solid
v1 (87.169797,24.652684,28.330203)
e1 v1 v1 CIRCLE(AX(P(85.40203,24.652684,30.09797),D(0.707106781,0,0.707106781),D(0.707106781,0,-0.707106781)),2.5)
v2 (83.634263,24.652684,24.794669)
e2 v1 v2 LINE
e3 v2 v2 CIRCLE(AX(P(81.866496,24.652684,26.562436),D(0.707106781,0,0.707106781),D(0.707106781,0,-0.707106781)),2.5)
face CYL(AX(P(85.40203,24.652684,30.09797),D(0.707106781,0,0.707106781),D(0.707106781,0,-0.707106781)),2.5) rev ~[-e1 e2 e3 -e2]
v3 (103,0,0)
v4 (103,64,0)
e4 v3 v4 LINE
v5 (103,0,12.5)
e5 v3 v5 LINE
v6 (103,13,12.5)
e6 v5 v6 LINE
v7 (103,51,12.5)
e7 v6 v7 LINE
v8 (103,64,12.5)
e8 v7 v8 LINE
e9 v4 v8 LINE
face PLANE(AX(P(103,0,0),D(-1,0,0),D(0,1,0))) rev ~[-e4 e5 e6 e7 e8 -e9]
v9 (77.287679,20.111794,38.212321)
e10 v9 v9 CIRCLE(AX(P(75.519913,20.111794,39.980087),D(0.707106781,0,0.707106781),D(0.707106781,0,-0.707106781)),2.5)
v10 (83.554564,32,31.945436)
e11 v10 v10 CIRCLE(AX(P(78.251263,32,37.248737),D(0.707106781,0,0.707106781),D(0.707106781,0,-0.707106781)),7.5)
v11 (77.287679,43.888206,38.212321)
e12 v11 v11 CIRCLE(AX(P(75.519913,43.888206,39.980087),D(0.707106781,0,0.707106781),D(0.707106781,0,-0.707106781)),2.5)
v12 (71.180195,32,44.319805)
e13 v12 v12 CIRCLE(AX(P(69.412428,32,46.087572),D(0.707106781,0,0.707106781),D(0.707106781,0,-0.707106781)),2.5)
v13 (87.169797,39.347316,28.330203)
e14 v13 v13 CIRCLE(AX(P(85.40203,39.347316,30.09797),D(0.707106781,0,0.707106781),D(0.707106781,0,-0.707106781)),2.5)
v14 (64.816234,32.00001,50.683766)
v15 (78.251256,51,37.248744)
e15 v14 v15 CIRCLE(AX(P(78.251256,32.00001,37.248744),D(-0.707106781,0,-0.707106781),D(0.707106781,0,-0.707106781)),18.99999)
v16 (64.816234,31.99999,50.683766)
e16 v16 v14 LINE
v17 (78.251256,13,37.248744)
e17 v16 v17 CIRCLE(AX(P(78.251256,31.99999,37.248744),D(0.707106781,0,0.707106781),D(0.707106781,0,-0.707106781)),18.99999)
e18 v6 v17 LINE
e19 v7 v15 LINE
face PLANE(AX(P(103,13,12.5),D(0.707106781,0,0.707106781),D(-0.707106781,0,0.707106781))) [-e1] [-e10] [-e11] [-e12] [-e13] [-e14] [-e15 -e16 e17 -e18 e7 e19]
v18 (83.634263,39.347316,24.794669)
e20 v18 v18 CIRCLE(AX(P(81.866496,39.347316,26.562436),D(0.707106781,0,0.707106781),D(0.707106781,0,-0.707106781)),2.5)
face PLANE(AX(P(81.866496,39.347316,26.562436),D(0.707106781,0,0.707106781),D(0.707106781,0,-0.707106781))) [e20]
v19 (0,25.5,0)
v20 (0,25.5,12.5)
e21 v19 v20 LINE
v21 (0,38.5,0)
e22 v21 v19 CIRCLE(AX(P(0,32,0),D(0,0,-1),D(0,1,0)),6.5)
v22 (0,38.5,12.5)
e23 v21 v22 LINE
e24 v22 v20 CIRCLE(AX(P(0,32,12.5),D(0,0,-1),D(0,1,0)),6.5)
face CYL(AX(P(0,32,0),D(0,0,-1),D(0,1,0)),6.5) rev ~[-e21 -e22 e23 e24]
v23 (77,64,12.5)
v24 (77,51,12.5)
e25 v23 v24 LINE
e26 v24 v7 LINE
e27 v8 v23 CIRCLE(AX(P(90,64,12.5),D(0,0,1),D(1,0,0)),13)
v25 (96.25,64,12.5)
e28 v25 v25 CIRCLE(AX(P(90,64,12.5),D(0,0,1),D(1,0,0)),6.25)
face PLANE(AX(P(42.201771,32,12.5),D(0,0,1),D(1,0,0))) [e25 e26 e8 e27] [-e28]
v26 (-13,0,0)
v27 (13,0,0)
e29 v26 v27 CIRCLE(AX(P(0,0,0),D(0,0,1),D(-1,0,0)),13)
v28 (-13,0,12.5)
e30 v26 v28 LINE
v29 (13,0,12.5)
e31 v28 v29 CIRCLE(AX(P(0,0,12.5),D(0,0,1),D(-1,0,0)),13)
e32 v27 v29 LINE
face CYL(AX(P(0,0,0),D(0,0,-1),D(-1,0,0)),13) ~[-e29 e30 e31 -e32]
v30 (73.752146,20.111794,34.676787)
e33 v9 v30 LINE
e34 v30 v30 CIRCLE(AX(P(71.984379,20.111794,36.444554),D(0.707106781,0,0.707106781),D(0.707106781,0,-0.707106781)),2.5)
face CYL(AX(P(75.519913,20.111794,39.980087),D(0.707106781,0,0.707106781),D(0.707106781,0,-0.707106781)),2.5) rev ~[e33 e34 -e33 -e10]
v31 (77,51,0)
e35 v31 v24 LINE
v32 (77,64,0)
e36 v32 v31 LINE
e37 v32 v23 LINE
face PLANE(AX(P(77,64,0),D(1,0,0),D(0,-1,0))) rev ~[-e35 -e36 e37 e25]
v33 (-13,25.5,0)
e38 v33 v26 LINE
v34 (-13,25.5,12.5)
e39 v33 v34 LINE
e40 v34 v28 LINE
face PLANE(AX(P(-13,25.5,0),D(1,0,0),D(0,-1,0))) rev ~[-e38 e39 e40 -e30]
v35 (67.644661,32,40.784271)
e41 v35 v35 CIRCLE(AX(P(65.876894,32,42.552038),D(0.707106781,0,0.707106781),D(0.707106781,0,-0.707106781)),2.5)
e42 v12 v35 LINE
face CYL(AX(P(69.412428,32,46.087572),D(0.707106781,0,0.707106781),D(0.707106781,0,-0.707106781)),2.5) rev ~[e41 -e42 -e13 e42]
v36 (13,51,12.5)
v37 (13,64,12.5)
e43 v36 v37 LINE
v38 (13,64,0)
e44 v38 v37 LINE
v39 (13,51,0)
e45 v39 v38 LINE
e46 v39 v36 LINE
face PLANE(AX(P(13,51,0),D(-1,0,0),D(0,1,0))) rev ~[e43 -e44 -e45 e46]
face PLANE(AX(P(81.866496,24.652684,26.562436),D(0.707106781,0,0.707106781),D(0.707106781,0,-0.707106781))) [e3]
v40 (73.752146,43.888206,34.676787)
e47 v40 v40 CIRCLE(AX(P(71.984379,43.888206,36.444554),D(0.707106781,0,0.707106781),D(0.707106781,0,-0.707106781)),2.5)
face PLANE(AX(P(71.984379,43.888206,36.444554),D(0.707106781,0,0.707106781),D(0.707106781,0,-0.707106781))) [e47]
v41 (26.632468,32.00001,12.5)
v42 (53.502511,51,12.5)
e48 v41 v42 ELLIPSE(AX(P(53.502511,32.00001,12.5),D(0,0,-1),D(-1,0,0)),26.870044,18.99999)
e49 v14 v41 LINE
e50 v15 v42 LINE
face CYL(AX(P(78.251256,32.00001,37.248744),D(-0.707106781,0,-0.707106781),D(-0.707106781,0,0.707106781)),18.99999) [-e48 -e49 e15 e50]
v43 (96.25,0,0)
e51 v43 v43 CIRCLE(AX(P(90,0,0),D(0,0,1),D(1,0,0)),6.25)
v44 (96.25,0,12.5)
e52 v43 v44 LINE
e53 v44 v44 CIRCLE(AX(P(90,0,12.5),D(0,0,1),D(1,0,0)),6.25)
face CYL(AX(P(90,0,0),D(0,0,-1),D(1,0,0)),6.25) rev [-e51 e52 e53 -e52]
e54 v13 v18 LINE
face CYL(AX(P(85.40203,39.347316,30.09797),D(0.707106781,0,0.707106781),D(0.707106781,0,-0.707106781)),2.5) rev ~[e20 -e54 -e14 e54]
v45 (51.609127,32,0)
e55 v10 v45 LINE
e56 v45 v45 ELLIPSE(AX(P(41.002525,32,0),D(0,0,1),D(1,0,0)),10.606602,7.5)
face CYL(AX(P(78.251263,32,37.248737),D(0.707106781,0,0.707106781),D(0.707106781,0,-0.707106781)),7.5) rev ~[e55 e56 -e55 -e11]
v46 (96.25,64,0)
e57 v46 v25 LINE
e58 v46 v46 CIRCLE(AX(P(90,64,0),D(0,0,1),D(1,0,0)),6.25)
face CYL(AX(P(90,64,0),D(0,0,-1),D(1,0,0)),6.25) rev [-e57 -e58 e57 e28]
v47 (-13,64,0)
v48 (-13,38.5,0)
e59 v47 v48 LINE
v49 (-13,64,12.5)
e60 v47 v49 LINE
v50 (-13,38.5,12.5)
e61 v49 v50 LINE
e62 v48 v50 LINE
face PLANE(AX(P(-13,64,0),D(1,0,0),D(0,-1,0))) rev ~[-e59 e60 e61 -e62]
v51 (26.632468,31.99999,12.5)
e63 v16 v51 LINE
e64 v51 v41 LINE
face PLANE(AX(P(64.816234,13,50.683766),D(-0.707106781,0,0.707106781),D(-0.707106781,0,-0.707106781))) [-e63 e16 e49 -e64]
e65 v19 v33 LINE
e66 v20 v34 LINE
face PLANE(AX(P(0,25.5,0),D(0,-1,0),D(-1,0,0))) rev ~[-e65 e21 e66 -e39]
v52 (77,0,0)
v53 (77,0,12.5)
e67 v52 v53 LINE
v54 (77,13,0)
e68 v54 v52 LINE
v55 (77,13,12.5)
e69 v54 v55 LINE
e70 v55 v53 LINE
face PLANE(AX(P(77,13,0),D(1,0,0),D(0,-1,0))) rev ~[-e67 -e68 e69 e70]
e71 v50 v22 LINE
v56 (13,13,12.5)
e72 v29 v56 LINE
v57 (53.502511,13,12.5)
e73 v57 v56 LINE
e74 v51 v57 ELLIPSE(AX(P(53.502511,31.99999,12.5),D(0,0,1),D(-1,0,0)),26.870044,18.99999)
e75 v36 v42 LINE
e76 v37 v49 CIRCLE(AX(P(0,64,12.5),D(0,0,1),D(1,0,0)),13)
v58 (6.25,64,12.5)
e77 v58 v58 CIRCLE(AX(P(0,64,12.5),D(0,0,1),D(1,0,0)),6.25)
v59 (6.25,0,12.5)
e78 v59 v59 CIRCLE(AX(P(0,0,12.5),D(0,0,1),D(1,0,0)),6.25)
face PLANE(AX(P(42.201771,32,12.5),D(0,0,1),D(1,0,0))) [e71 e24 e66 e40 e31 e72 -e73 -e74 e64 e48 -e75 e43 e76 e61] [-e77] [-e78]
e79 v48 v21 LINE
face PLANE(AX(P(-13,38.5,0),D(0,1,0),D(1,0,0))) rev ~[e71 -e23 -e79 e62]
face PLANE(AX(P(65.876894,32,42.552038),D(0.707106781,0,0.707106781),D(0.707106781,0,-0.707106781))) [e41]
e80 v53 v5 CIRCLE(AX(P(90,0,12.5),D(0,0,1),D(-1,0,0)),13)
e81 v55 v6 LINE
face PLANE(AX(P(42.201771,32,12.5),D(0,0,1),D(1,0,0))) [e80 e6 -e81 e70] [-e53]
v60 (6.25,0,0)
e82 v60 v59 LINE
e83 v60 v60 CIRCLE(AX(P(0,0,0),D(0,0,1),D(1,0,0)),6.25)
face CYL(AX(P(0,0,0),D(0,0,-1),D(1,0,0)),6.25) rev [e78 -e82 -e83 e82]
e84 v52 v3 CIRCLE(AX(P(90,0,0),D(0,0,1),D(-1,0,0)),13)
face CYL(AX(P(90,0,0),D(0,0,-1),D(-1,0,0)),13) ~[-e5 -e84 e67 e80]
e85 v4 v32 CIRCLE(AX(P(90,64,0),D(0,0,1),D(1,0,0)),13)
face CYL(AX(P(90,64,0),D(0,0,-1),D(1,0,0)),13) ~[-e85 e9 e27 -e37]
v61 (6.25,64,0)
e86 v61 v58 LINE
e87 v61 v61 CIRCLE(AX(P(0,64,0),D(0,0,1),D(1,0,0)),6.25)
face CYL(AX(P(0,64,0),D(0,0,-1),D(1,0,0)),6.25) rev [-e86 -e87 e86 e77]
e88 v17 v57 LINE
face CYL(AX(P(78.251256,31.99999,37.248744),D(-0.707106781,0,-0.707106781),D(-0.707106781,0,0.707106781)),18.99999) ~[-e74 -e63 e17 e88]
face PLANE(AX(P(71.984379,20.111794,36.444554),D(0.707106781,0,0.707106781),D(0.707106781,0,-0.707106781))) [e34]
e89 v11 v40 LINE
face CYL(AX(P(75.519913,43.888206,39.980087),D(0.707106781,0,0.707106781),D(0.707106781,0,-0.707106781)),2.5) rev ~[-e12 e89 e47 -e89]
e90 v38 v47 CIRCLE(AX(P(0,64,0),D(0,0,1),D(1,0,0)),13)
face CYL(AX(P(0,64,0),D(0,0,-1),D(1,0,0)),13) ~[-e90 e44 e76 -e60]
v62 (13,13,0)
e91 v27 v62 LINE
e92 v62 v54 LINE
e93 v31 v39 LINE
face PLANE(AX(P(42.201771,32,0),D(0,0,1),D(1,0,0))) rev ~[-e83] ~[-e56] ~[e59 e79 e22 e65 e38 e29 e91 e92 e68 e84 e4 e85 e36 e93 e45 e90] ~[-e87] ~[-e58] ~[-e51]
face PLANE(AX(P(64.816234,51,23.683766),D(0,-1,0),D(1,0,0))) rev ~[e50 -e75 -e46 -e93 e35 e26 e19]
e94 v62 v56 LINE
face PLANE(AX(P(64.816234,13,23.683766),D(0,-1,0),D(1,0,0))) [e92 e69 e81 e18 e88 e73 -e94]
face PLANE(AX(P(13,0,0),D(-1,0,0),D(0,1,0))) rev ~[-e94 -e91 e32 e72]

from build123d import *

# Parameters (mm, degrees)
F0_R     = 6.25
F1_DEPTH = 12.5
F3_DEPTH = 38
F4_R     = 18.99999
F5_R     = 2.5
F6_DEPTH = 5
F7_R     = 7.5
F8_DEPTH = 100


# Not quite as in the source:
# - a fillet or chamfer is up to 0.001 mm smaller than in the source, because OpenCascade refuses the exact size


with BuildPart() as f1:
    # F0 (on Top) → F1 (new body)
    with BuildSketch(Plane.XY):
        with BuildLine():
            Line((-13, 25.5), (-13, 0))
            ThreePointArc((-13, 0), (0, -13), (13, 0))
            Line((13, 0), (13, 13))
            Line((13, 13), (77, 13))
            Line((77, 13), (77, 0))
            ThreePointArc((77, 0), (90, -13), (103, 0))
            Line((103, 0), (103, 64))
            ThreePointArc((103, 64), (90, 77), (77, 64))
            Line((77, 64), (77, 51))
            Line((77, 51), (13, 51))
            Line((13, 51), (13, 64))
            ThreePointArc((13, 64), (0, 77), (-13, 64))
            Line((-13, 64), (-13, 38.5))
            Line((-13, 38.5), (0, 38.5))
            ThreePointArc((0, 38.5), (6.5, 32), (0, 25.5))
            Line((0, 25.5), (-13, 25.5))
        make_face()
        Circle(F0_R, mode=Mode.SUBTRACT)
        with Locations((90, 0)):
            Circle(F0_R, mode=Mode.SUBTRACT)
        with Locations((0, 64)):
            Circle(F0_R, mode=Mode.SUBTRACT)
        with Locations((90, 64)):
            Circle(F0_R, mode=Mode.SUBTRACT)
    extrude(amount=F1_DEPTH)

    # F2 (on face) → F3 (join)
    with BuildSketch(Plane.XZ.offset(-13)):
        Polygon((26.6324676319, 12.5), (77, 12.5), (103, 12.5), (64.8162338159, 50.6837661841), align=None)
    extrude(amount=-F3_DEPTH)

    # F4 (radius 19 in the source; OpenCascade refuses exactly that, so slightly less here)
    f4_edges = [f1.edges().sort_by_distance(p)[0] for p in [
        (45.724351, 13, 31.591883),
        (45.724351, 51, 31.591883),
    ]]
    fillet(f4_edges, radius=F4_R)

    # F5 (on face) → F6 (cut)
    with BuildSketch(Plane(origin=(57.75, 0, 57.75), x_dir=(0.7071067812, 0, -0.7071067812), z_dir=(0.7071067812, 0, 0.7071067812))):
        with Locations((25.1304512677, 20.1117935463)):
            Circle(F5_R)
        with Locations((39.1058761271, 24.6526843463)):
            Circle(F5_R)
        with Locations((39.1058761271, 39.3473156537)):
            Circle(F5_R)
        with Locations((25.1304512677, 43.8882064537)):
            Circle(F5_R)
        with Locations((16.4931636974, 32)):
            Circle(F5_R)
    extrude(amount=-F6_DEPTH, mode=Mode.SUBTRACT)

    # F7 (on face) → F8 (cut)
    with BuildSketch(Plane(origin=(57.75, 0, 57.75), x_dir=(0.7071067812, 0, -0.7071067812), z_dir=(0.7071067812, 0, 0.7071067812))):
        with Locations((28.9931636974, 32)):
            Circle(F7_R)
    extrude(amount=-F8_DEPTH, mode=Mode.SUBTRACT)


solid = f1.part
